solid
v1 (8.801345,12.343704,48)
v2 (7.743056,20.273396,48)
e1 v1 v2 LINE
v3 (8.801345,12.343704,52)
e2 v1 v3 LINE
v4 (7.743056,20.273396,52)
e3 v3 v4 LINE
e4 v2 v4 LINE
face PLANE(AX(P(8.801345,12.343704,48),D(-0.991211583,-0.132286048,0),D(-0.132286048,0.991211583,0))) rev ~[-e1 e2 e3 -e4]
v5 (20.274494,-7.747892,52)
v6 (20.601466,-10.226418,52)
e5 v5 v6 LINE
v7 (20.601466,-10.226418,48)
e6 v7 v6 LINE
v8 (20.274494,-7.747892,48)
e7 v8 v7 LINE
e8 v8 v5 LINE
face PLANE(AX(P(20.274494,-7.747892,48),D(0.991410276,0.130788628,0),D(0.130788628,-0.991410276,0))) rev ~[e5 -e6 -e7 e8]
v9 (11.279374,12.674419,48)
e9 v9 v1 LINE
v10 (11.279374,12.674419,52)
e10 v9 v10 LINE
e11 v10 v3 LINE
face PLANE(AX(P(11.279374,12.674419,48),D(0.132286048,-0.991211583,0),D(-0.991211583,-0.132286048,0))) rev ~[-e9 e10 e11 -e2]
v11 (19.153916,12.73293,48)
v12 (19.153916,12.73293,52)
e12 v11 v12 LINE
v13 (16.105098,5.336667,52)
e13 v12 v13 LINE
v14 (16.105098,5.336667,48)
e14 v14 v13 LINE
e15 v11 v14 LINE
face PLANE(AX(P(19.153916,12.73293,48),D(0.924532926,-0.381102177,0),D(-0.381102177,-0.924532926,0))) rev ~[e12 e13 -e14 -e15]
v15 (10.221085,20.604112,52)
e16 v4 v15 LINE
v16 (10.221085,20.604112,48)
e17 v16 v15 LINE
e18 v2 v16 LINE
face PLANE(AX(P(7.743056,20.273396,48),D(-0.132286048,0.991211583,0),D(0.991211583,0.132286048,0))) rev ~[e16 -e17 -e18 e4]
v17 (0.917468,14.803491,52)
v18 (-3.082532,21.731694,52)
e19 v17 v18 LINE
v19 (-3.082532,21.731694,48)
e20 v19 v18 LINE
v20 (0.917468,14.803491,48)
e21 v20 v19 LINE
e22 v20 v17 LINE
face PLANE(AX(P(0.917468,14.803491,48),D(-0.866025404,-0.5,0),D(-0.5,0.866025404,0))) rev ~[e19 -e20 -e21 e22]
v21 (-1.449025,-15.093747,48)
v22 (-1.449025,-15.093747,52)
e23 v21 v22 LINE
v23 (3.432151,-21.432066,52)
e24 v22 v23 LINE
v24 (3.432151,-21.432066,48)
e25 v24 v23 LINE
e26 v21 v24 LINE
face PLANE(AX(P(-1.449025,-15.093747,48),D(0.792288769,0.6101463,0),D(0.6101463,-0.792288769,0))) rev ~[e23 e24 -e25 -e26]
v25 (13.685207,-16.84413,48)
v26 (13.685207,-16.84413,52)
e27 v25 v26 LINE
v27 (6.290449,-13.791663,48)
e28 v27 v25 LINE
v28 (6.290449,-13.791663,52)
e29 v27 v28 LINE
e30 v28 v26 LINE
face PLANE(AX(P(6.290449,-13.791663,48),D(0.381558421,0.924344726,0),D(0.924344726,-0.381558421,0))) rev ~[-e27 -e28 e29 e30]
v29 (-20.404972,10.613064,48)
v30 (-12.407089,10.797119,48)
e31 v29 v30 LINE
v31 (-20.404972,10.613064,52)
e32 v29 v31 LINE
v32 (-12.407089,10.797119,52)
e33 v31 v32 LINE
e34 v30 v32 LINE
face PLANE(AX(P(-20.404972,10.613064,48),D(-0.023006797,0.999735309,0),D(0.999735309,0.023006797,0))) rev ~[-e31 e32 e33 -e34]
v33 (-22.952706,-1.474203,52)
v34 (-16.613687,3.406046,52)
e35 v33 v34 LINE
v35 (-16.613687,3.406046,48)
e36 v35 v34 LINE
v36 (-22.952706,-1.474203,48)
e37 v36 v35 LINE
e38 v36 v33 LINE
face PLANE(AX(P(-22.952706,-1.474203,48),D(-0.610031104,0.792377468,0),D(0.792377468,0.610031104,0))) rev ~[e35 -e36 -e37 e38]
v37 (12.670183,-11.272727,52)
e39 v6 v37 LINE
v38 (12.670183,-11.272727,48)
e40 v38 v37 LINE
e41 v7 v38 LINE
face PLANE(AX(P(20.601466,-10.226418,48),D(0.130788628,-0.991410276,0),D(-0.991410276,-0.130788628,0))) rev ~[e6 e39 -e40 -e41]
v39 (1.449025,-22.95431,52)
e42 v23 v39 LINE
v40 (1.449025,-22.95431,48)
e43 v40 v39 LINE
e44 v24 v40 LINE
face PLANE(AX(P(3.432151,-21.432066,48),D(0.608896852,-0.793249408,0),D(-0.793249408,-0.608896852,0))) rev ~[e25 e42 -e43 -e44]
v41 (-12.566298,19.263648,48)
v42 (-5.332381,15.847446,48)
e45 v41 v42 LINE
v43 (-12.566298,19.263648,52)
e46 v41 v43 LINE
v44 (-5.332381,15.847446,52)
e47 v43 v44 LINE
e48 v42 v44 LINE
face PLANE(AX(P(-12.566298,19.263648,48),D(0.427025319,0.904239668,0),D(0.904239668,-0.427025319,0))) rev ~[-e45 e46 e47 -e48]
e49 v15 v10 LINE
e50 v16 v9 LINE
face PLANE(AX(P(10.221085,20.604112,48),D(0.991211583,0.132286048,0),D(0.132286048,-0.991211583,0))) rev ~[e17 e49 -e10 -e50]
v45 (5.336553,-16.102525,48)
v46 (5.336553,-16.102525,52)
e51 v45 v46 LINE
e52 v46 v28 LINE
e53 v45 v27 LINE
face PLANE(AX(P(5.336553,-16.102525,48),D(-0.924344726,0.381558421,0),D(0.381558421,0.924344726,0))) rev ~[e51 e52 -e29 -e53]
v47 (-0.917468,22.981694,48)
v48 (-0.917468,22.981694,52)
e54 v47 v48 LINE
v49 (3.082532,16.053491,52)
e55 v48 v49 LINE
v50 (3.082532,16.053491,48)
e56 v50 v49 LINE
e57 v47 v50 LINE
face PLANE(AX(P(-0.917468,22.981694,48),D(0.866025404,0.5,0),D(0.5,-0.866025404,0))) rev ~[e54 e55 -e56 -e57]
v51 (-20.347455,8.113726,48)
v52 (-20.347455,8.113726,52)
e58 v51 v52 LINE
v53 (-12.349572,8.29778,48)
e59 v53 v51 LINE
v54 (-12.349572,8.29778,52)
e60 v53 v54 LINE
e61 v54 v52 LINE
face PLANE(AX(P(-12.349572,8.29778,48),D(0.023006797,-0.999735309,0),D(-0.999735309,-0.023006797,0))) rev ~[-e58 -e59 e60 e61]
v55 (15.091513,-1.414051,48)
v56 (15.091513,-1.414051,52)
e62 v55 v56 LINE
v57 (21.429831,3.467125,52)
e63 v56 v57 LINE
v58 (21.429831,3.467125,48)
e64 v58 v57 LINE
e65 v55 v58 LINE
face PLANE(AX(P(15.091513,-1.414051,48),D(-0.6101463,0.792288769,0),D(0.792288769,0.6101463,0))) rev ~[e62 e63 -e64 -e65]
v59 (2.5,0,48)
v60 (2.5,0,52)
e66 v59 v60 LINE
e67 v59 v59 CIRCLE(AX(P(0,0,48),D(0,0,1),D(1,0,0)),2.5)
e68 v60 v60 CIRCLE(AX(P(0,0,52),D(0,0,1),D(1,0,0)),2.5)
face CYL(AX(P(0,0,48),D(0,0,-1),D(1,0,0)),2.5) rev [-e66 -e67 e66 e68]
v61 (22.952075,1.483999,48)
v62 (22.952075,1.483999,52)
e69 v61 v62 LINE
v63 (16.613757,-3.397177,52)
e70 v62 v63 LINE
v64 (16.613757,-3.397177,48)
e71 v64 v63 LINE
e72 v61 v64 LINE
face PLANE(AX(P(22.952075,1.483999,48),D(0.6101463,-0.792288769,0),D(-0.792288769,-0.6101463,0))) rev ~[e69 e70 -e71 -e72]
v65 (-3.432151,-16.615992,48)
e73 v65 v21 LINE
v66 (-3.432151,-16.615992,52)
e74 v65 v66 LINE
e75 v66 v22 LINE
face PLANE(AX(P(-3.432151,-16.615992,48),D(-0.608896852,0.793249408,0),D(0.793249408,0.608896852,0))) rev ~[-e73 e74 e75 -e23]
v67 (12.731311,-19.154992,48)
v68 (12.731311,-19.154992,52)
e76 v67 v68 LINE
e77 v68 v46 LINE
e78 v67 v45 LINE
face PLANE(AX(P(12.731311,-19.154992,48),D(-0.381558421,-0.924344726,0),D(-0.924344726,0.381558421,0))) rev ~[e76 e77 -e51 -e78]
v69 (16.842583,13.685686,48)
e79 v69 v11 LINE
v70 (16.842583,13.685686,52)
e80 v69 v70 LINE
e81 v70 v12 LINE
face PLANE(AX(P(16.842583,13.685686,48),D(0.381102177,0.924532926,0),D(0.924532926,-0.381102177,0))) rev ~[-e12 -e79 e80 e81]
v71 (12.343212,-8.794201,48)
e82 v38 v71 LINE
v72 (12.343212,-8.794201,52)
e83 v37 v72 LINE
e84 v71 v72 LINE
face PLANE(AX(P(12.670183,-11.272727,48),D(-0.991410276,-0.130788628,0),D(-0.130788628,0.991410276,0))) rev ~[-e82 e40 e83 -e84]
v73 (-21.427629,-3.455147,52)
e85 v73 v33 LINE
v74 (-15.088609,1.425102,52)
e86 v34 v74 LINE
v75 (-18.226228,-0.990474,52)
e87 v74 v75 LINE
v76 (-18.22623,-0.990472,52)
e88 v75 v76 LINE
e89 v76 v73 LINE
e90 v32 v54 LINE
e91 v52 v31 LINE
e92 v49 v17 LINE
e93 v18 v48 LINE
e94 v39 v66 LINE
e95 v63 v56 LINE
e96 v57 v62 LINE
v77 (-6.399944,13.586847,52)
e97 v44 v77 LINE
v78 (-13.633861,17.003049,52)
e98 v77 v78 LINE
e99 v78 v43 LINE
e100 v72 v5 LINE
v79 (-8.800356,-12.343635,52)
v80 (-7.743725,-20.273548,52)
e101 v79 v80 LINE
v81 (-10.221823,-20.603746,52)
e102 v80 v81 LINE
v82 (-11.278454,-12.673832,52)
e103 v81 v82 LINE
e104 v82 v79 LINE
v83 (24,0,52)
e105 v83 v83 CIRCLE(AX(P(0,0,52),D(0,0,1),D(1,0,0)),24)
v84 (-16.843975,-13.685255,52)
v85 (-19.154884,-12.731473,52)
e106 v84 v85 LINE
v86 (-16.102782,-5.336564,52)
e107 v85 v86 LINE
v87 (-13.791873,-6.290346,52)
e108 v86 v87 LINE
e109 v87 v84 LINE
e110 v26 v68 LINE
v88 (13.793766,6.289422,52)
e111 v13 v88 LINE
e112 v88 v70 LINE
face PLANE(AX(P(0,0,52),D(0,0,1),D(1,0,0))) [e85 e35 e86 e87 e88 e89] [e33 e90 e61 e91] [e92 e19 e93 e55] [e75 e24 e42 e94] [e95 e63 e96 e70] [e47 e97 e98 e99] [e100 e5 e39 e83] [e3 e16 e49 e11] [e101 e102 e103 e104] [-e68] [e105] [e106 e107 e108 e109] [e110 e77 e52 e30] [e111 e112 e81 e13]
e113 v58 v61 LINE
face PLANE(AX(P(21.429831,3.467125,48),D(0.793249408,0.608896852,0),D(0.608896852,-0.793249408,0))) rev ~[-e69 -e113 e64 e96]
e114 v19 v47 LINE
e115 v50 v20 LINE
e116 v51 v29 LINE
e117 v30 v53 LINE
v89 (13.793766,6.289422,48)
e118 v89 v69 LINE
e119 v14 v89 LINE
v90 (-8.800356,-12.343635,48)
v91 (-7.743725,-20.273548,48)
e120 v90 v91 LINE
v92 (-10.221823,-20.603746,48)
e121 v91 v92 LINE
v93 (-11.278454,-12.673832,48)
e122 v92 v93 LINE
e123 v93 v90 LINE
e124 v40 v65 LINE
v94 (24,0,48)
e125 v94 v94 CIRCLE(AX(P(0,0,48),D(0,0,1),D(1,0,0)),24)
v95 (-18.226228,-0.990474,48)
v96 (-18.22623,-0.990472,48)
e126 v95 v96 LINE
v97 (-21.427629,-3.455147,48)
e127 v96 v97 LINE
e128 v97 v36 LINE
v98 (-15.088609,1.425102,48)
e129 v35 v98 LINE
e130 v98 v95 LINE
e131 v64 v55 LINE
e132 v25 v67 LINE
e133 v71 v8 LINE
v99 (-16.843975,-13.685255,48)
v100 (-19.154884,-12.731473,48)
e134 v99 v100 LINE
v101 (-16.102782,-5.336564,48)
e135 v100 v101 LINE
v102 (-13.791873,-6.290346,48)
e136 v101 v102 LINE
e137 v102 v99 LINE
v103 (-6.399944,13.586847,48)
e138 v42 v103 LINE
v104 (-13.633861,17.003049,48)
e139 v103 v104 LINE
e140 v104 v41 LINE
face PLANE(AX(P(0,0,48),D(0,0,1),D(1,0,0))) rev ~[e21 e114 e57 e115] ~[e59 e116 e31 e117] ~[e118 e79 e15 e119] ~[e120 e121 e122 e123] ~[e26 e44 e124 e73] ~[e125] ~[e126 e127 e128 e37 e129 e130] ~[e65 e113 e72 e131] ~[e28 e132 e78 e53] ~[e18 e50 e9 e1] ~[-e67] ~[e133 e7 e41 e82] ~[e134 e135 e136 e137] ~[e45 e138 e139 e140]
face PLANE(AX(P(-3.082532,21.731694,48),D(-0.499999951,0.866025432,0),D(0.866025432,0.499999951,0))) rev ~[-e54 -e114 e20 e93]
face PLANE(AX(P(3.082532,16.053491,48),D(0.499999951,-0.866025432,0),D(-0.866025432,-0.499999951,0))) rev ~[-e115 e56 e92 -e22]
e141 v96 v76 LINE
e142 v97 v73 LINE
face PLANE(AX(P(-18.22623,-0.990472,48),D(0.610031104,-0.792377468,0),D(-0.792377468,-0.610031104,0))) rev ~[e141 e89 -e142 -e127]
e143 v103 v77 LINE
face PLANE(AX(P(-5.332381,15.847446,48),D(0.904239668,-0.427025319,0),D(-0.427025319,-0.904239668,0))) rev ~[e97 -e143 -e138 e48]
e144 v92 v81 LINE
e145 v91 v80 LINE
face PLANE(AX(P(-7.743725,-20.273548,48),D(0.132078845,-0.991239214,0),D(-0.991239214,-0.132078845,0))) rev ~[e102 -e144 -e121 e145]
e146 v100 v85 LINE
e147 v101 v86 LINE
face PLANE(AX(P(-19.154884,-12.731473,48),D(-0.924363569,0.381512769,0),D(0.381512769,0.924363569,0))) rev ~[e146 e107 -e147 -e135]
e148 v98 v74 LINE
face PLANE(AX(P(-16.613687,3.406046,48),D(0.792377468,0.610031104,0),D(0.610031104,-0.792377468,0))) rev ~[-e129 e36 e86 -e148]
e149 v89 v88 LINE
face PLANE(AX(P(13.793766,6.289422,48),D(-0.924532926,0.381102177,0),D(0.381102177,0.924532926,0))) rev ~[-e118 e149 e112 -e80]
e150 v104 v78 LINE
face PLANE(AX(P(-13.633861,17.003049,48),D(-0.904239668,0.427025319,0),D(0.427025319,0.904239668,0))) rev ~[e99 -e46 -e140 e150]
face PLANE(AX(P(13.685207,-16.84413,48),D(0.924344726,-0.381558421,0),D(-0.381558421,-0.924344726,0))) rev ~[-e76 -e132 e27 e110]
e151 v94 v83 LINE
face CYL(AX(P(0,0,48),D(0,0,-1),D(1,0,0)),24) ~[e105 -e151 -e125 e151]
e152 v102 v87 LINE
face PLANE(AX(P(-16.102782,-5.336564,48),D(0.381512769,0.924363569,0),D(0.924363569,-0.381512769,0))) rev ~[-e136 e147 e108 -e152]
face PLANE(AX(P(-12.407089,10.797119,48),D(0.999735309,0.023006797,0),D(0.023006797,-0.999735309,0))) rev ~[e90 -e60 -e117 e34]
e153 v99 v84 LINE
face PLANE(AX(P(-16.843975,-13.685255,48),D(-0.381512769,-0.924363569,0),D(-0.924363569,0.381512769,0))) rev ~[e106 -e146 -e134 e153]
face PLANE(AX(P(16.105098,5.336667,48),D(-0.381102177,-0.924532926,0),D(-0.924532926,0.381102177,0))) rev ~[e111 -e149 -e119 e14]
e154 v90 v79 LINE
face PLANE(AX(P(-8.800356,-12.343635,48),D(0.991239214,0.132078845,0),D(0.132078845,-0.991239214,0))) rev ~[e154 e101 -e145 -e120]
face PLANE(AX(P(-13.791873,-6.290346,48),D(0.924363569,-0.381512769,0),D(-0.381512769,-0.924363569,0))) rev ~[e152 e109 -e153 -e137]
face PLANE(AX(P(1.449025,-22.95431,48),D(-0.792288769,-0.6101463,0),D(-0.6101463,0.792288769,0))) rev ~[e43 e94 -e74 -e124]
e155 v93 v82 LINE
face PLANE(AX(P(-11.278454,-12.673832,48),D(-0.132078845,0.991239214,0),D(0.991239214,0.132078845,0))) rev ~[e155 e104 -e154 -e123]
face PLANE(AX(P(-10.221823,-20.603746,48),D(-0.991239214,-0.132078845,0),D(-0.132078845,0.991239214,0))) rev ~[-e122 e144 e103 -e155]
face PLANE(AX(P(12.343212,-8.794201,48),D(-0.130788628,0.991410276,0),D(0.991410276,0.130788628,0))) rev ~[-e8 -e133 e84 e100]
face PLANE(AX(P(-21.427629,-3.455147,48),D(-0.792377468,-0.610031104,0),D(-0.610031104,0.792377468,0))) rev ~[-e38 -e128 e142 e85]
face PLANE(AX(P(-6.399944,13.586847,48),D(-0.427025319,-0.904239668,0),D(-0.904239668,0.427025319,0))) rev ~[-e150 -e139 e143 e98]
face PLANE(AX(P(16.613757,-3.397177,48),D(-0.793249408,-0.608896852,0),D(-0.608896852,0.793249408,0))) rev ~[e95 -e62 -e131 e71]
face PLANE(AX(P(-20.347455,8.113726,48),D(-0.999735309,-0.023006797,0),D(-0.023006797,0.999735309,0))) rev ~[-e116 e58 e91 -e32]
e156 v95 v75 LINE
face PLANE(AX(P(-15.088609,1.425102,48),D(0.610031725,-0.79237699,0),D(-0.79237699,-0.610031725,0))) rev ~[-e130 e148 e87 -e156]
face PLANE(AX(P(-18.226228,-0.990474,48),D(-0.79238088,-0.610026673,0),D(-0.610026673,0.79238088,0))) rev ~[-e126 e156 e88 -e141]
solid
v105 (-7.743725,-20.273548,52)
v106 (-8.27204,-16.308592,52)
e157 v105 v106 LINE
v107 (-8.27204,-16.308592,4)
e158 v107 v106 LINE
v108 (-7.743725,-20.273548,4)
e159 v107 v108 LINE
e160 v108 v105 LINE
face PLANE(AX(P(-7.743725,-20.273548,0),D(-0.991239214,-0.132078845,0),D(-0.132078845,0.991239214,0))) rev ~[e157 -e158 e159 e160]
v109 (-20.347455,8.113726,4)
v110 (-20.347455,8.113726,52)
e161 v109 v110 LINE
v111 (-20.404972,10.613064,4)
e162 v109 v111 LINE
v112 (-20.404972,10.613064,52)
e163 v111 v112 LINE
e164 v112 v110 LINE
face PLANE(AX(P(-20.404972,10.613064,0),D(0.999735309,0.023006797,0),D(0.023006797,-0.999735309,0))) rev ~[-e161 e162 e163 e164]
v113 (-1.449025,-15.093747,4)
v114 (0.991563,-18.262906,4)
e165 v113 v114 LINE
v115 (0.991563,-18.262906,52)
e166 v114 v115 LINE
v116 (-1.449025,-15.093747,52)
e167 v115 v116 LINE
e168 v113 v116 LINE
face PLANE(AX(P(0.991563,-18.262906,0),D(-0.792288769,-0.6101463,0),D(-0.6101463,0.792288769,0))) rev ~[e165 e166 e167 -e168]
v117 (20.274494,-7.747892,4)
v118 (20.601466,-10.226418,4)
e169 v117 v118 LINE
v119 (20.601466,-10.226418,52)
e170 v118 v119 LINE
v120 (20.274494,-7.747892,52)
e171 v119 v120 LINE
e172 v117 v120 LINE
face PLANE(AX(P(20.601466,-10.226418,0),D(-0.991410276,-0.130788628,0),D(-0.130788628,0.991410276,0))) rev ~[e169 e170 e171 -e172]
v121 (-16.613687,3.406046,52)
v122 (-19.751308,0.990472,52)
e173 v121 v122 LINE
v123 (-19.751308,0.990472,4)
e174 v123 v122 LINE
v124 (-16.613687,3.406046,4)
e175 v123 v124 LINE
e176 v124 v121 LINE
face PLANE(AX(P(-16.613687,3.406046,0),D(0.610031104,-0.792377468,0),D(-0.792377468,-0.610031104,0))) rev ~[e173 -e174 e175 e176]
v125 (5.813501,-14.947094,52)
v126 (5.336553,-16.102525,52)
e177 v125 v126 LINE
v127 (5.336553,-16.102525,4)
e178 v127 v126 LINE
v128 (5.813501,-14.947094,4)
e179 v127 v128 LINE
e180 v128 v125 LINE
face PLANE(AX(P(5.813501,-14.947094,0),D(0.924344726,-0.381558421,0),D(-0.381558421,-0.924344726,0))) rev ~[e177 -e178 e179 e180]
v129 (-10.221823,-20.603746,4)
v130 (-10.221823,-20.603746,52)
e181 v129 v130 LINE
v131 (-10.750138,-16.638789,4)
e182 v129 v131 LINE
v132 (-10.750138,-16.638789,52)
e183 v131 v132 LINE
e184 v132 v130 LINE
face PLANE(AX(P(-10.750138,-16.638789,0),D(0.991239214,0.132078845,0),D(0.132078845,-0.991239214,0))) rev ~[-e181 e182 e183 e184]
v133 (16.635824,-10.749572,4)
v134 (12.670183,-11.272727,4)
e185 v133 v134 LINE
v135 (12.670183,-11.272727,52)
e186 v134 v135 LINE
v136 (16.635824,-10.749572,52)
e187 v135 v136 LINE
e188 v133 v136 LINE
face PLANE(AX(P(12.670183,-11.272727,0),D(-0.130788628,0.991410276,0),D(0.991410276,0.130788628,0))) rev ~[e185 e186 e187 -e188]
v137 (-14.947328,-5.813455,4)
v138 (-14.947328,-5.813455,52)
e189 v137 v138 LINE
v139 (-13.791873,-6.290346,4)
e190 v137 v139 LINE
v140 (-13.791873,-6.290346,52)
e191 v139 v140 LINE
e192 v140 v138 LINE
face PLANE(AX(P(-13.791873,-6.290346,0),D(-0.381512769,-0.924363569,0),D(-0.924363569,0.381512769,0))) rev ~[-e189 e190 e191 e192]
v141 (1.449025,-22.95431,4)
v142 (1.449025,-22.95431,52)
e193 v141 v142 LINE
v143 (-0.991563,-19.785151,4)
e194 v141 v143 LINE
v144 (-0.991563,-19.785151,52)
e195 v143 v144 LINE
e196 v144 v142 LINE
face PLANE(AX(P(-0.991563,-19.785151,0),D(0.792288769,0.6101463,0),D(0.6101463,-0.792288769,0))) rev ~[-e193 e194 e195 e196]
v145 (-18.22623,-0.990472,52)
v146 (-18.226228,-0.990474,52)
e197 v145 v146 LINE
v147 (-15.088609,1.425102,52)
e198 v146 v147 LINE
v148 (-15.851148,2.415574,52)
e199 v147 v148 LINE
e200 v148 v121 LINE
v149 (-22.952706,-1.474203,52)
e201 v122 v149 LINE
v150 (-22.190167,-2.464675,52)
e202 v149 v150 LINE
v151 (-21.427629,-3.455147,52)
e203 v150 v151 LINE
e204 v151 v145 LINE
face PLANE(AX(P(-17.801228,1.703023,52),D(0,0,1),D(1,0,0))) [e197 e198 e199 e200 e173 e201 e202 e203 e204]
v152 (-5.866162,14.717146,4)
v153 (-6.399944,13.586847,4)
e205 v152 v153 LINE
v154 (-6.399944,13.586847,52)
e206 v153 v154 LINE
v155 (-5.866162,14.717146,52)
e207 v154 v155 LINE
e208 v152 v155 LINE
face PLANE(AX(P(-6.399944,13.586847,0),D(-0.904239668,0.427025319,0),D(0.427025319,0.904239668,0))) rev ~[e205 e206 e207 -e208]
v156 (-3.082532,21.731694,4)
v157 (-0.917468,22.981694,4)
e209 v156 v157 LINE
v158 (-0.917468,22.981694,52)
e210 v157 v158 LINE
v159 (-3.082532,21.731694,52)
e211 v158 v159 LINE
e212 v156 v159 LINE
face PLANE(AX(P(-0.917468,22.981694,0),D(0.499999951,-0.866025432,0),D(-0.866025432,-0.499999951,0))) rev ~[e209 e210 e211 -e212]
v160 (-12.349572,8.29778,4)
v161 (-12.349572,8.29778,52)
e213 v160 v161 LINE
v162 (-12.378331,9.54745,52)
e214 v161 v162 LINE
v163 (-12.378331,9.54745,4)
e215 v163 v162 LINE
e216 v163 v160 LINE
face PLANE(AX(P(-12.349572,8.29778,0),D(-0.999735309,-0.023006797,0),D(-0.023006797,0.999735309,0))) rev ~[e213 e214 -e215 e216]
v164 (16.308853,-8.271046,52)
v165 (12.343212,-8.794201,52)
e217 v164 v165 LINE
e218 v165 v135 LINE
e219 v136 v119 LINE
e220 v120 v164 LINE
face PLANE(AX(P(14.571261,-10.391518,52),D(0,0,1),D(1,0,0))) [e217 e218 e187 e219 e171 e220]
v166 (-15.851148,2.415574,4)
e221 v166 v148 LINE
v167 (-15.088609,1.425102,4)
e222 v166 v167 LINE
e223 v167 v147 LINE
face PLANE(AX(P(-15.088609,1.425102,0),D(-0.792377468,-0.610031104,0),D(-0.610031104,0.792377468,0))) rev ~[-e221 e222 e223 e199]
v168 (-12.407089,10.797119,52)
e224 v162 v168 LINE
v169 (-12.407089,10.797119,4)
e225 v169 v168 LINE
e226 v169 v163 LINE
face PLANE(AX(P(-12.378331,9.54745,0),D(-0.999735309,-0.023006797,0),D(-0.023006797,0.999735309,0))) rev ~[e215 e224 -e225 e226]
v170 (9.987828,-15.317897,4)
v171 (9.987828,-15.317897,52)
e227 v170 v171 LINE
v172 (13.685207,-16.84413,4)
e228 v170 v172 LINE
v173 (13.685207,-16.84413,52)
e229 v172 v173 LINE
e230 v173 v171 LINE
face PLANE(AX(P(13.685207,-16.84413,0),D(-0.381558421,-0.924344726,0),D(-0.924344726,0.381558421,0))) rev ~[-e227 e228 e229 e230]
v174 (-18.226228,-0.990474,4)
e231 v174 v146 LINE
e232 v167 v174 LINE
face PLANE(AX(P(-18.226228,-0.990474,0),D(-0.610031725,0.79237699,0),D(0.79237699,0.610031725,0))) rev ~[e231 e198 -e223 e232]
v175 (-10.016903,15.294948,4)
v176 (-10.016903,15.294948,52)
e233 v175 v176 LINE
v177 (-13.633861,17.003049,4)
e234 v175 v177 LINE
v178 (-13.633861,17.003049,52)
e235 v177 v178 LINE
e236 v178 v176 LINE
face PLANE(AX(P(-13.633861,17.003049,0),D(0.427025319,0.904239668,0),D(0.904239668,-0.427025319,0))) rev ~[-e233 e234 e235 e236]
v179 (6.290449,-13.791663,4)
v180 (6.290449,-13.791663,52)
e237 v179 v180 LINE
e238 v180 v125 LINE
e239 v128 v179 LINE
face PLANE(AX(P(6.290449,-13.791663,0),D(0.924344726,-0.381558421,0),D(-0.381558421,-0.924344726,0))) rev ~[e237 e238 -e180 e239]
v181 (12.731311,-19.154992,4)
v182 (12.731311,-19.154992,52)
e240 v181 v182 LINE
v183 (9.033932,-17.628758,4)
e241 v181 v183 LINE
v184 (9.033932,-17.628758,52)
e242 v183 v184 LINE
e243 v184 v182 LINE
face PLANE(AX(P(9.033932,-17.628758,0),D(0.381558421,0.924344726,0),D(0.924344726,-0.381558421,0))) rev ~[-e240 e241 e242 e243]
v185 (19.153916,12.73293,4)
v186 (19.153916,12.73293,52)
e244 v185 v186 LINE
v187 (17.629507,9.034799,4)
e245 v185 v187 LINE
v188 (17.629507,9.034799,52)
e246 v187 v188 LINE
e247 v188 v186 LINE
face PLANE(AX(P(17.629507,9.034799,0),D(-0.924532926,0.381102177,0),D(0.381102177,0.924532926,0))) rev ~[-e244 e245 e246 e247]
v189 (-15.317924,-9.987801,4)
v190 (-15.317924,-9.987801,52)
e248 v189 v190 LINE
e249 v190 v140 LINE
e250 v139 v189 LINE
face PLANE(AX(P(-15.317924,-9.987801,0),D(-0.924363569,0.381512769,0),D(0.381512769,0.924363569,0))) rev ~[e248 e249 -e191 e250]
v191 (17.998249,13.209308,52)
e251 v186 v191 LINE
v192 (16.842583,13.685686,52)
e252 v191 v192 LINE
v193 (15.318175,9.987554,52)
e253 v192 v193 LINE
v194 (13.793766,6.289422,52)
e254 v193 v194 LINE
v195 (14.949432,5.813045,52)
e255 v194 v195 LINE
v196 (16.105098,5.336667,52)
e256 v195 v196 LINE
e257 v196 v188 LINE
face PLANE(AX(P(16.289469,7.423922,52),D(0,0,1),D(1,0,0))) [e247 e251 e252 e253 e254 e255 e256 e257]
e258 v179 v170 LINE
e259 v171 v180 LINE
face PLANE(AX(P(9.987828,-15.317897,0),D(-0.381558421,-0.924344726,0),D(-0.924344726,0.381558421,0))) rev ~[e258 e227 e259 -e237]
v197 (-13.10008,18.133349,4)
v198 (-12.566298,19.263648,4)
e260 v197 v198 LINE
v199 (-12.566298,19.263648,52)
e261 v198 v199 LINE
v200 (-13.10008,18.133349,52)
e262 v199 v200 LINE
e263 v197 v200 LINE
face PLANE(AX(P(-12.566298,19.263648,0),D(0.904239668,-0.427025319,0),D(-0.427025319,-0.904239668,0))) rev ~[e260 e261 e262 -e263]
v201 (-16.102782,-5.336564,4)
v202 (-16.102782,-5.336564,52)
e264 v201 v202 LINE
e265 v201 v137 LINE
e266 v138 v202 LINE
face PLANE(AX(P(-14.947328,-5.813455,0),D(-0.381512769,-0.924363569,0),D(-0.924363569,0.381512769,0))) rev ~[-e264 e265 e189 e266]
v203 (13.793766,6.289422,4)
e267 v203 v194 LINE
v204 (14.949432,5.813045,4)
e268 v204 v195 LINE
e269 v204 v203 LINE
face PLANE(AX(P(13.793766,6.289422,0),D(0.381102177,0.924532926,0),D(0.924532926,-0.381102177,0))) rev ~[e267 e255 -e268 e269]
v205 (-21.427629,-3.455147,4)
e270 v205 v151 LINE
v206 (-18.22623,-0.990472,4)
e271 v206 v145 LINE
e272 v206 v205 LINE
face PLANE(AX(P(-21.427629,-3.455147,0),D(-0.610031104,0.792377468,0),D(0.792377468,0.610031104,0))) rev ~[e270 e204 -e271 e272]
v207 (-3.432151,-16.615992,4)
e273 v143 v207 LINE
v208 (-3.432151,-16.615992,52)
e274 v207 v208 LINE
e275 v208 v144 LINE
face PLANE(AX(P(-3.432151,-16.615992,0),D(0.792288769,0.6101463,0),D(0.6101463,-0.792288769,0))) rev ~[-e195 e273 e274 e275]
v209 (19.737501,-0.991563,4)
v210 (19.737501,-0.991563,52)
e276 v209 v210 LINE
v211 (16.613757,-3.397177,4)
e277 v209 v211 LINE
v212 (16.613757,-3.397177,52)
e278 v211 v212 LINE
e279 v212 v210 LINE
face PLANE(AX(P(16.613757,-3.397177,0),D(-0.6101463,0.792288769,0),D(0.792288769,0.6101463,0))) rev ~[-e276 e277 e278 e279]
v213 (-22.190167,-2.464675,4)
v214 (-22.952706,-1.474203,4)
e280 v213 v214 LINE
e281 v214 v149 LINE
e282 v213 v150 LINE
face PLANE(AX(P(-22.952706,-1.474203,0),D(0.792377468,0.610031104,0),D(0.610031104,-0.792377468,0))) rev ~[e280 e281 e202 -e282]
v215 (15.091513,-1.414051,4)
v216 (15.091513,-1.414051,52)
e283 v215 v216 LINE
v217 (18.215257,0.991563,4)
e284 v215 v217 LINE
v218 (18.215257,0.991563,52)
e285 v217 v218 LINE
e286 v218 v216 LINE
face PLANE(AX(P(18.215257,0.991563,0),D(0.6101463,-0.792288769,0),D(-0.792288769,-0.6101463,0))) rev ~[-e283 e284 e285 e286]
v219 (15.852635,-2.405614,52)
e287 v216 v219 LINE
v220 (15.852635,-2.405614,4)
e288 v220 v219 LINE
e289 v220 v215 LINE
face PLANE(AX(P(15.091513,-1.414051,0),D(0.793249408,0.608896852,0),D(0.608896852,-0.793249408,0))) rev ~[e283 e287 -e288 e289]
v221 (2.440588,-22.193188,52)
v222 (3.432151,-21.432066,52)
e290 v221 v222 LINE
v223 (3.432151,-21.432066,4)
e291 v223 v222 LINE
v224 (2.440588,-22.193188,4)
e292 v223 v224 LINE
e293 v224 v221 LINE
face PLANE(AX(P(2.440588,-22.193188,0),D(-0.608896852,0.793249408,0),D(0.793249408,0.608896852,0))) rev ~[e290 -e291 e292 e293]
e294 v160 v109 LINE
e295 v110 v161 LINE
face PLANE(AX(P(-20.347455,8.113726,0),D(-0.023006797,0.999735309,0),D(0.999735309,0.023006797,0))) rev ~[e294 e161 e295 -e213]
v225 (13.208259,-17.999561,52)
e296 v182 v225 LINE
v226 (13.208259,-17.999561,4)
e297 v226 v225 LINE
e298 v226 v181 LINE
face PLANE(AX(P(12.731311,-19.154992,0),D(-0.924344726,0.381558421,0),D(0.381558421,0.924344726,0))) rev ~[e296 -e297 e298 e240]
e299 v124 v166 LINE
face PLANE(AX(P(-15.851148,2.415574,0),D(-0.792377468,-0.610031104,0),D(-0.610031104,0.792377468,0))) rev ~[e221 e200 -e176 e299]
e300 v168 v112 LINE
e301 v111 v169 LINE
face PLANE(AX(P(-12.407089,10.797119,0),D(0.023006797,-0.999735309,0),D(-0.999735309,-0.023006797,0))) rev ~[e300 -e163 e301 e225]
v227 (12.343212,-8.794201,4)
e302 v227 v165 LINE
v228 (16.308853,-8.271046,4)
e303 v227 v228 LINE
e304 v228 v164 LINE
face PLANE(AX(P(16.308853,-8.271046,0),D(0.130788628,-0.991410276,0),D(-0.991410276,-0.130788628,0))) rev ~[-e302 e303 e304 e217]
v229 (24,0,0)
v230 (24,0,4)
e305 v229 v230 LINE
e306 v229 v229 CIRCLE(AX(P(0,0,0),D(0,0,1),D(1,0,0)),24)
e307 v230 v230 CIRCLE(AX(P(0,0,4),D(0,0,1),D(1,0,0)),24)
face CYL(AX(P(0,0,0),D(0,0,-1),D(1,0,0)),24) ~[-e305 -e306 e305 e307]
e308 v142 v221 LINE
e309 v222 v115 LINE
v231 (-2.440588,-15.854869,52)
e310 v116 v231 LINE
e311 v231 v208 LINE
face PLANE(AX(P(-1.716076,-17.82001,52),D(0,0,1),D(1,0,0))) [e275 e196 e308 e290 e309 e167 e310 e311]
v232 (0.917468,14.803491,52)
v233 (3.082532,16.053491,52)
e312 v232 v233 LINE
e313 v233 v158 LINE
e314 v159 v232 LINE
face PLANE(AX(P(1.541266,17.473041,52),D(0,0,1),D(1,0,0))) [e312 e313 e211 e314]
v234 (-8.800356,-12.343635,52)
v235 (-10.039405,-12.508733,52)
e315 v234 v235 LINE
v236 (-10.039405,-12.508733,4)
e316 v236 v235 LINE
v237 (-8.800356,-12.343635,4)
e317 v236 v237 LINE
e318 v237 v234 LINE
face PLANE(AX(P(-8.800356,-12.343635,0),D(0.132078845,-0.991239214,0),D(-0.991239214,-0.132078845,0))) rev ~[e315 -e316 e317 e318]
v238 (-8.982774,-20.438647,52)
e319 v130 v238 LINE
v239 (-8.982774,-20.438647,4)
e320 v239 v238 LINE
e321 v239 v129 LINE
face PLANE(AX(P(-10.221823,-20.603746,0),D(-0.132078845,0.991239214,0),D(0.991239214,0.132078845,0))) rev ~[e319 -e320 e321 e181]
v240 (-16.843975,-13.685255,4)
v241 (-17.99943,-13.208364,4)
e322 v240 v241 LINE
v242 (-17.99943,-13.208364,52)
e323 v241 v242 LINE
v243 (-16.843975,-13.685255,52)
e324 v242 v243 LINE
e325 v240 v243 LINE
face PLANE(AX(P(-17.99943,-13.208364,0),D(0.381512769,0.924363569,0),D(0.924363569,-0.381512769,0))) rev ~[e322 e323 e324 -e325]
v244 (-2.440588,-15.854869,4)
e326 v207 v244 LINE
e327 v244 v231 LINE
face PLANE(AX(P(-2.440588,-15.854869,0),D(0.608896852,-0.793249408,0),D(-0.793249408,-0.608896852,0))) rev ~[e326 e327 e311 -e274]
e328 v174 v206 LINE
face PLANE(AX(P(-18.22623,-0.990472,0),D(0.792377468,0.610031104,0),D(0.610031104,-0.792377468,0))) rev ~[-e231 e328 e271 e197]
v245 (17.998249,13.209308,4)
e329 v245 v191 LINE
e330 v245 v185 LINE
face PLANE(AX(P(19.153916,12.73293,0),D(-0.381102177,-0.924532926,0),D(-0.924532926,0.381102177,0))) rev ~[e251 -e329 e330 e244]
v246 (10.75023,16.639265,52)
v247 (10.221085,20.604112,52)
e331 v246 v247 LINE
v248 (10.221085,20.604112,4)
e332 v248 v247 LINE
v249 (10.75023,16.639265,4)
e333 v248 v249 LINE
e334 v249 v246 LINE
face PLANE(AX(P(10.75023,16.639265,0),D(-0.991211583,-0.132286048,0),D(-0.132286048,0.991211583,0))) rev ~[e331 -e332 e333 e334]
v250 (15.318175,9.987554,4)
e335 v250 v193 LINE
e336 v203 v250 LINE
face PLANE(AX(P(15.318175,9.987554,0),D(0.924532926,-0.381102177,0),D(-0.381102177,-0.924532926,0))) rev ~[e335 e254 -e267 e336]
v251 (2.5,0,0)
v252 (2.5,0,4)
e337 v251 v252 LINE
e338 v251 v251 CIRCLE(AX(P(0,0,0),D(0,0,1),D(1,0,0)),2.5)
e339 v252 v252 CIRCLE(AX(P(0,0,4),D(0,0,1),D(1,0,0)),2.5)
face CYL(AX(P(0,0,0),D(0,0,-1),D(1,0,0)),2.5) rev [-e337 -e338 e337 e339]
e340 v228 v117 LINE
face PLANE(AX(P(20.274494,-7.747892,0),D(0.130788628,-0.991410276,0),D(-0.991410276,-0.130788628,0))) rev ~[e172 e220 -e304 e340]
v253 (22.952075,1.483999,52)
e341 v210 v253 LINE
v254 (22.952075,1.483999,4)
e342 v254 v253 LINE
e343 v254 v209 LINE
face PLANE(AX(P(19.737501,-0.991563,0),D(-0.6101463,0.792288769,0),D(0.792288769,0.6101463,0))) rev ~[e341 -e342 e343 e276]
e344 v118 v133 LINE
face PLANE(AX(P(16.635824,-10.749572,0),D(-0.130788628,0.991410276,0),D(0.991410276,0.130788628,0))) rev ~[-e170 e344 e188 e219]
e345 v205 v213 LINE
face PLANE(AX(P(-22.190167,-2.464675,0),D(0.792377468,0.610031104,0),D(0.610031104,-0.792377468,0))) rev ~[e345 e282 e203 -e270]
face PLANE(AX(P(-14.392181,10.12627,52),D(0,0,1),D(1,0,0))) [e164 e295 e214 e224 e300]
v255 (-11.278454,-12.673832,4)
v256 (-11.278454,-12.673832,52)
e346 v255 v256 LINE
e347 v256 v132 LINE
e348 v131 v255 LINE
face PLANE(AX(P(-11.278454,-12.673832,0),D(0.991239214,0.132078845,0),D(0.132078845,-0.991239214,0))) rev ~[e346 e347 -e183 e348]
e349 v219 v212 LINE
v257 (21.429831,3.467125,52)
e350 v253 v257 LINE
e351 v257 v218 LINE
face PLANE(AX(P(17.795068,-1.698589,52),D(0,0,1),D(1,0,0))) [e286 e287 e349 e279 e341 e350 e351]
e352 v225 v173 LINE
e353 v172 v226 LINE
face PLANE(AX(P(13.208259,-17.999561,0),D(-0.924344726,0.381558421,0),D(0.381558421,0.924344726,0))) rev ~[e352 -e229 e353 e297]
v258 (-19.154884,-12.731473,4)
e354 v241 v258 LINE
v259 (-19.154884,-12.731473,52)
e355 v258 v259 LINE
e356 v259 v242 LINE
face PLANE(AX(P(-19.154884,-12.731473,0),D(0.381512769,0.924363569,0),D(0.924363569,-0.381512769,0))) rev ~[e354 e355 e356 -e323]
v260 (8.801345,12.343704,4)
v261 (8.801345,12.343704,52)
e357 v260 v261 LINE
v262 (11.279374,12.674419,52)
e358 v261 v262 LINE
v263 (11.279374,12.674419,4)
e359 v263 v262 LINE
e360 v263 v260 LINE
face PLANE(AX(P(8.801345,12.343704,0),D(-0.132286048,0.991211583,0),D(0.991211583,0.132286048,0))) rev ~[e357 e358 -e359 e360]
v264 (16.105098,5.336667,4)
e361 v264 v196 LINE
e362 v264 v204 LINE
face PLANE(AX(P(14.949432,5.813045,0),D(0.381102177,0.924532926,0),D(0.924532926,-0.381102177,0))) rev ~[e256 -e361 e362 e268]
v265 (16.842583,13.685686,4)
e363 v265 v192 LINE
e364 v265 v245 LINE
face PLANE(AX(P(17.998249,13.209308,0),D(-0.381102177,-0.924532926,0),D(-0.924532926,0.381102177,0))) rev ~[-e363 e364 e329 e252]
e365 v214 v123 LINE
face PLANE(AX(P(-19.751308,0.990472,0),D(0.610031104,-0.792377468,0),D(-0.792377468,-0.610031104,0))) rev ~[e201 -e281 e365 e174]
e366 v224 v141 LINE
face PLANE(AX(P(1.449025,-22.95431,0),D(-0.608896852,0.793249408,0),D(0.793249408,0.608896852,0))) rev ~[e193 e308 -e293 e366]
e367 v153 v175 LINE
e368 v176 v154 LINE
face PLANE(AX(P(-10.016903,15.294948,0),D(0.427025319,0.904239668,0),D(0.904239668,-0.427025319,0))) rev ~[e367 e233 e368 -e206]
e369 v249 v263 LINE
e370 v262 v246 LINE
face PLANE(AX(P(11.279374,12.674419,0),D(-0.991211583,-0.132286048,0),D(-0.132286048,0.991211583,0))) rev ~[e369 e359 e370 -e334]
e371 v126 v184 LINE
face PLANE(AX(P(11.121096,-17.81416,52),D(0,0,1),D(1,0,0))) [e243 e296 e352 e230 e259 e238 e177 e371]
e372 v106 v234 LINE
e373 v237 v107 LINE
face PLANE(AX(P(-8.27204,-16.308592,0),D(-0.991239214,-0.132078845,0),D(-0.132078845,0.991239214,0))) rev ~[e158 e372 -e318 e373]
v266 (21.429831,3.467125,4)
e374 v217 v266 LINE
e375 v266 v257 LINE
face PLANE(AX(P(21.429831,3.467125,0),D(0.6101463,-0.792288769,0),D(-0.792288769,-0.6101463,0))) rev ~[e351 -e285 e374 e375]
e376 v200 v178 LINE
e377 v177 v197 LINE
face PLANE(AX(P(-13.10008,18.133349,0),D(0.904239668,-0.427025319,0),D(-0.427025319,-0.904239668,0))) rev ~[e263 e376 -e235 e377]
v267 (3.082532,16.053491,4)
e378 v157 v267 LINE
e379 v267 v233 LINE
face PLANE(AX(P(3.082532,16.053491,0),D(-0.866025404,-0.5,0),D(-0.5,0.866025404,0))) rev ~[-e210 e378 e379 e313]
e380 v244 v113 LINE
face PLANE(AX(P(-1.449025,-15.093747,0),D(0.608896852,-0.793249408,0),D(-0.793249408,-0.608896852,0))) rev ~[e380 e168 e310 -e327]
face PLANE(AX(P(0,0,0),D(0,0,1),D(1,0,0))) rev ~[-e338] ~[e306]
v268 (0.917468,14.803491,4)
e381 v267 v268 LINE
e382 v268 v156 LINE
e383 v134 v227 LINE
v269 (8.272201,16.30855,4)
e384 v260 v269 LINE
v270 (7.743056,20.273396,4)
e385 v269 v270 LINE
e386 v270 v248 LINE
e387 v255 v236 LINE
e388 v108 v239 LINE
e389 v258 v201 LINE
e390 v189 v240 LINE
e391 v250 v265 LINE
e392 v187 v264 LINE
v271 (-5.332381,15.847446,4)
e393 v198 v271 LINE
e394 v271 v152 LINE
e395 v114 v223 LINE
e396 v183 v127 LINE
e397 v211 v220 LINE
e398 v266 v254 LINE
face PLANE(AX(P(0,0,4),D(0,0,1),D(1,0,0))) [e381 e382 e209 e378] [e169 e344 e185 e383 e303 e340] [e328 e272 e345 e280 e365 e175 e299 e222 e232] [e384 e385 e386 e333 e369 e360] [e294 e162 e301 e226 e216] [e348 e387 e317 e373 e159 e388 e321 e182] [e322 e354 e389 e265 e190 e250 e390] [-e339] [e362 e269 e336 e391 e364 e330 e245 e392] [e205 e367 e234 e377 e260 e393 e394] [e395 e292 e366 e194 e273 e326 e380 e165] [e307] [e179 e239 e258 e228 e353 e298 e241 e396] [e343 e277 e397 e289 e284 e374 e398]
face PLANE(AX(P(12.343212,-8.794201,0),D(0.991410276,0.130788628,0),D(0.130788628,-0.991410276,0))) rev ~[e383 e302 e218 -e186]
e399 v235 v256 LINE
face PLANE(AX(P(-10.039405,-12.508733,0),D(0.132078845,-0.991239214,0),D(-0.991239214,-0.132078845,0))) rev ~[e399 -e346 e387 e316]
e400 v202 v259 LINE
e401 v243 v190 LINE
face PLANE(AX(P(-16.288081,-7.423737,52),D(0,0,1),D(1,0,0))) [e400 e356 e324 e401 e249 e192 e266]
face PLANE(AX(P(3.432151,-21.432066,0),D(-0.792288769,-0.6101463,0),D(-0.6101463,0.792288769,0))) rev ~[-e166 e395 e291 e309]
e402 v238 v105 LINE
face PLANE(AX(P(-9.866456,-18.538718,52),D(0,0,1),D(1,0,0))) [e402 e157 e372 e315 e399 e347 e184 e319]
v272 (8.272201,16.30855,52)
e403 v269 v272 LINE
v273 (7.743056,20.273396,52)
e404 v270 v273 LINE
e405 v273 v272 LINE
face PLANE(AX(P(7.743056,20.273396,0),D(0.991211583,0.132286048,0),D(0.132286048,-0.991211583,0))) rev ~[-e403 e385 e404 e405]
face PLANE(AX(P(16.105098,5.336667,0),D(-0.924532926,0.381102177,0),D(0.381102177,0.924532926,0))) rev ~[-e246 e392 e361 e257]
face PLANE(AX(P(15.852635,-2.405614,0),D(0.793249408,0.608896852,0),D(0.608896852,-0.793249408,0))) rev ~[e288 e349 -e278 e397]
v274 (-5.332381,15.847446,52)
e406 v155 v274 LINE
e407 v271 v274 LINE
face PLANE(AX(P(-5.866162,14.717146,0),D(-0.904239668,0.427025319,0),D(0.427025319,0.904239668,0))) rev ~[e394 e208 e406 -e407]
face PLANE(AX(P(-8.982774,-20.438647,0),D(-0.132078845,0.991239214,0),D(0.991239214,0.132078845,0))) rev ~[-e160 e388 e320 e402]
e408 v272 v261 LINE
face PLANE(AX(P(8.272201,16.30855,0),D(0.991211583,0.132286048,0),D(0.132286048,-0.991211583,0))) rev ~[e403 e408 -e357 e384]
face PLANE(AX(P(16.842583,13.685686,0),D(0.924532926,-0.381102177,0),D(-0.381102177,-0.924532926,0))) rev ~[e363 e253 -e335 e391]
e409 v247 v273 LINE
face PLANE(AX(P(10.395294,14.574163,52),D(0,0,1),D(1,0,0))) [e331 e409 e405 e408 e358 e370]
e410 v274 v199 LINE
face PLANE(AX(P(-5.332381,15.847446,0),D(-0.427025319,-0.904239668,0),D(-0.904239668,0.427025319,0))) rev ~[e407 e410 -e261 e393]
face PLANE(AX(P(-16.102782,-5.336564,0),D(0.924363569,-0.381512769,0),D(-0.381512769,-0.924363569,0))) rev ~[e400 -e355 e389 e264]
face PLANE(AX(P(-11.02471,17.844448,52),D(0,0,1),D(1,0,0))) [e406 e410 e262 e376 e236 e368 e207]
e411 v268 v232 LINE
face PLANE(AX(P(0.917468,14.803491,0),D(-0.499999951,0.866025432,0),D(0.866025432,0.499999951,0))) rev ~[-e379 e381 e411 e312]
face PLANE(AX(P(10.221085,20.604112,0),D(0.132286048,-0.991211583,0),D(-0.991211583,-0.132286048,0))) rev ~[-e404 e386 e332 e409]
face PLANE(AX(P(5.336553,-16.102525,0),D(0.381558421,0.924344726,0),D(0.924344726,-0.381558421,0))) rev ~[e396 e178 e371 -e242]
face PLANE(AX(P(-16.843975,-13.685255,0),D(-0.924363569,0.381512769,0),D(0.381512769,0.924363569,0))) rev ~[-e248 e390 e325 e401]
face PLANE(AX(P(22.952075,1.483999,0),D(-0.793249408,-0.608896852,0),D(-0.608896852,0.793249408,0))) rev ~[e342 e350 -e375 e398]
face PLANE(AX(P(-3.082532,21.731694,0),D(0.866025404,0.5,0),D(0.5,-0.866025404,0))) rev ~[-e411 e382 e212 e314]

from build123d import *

# Parameters (mm, degrees)
F0_R        = 24
F0_R_2      = 2.5
F1_DEPTH    = 4
F2_DEPTH    = 52
F3_START    = 44
F1_FACE_R   = 24
F1_FACE_R_2 = 2.5
F3_DEPTH    = 4


# Not quite as in the source:
# - ends of sketch curves that miss each other by under 0.0002 mm in the source are joined


with BuildPart() as f1:
    # F0 (on Top) → F1 (new body)
    with BuildSketch(Plane.XY):
        Circle(F0_R)
        Polygon((-8.9827740816, -20.4386470385), (-10.2218230987, -20.6037455949), (-10.7501384793, -16.6387887403), (-11.2784538598, -12.6738318857), (-10.0394048428, -12.5087333293), (-8.8003558257, -12.3436347729), (-8.2720404452, -16.3085916275), (-7.7437250646, -20.273548482), align=None, mode=Mode.SUBTRACT)
        Polygon((-17.9994299012, -13.2083639741), (-19.154884362, -12.7314730129), (-17.6288332862, -9.0340187381), (-16.1027822104, -5.3365644633), (-14.9473277496, -5.8134554245), (-13.7918732887, -6.2903463857), (-15.3179243645, -9.9878006605), (-16.8439754403, -13.6852549352), align=None, mode=Mode.SUBTRACT)
        Polygon((-22.1901674017, -2.4646747911), (-22.9527062815, -1.4742029558), (-19.7513076007, 0.9904718354), (-16.613686535, 3.4060458753), (-15.8511476551, 2.4155740399), (-15.0886087753, 1.4251022046), (-18.226229841, -0.9904718354), (-21.4276285218, -3.4551466265), align=None, mode=Mode.SUBTRACT)
        Polygon((2.4405882298, -22.1931875166), (1.4490252381, -22.954309527), (-0.9915629917, -19.7851505161), (-3.4321512214, -16.6159915053), (-2.4405882298, -15.8548694949), (-1.4490252381, -15.0937474845), (0.9915629917, -18.2629064954), (3.4321512214, -21.4320655062), align=None, mode=Mode.SUBTRACT)
        Polygon((13.2082589659, -17.9995611772), (12.7313109402, -19.1549920841), (9.0339320379, -17.6287584019), (5.3365531356, -16.1025247196), (5.8135011613, -14.9470938127), (6.290449187, -13.7916629057), (9.9878280893, -15.3178965879), (13.6852069916, -16.8441302702), align=None, mode=Mode.SUBTRACT)
        Polygon((20.4379798112, -8.9871546743), (20.6014655966, -10.2264175189), (16.6358244939, -10.7495720322), (12.6701833913, -11.2727265454), (12.5066976059, -10.0334637008), (12.3432118205, -8.7942008562), (16.3088529232, -8.271046343), (20.2744940258, -7.7478918297), align=None, mode=Mode.SUBTRACT)
        Polygon((-20.3762131188, 9.3633951434), (-20.4049716149, 10.6130642792), (-16.4060303805, 10.7050914668), (-12.407089146, 10.7971186544), (-12.3783306499, 9.5474495186), (-12.3495721537, 8.2977803828), (-16.3485133882, 8.2057531952), (-20.3474546227, 8.1137260076), align=None, mode=Mode.SUBTRACT)
        Polygon((-13.1000797836, 18.1333488537), (-12.5662981354, 19.2636484388), (-8.9493394632, 17.5555471644), (-5.332380791, 15.84744589), (-5.8661624392, 14.7171463049), (-6.3999440875, 13.5868467198), (-10.0169027597, 15.2949479943), (-13.6338614319, 17.0030492687), align=None, mode=Mode.SUBTRACT)
        Circle(F0_R_2, mode=Mode.SUBTRACT)
        Polygon((22.1909529643, 2.4755624376), (22.9520749747, 1.4839994459), (19.737501164, -0.9915629917), (16.613756953, -3.3971770136), (15.8526349426, -2.4056140219), (15.0915129323, -1.4140510302), (18.2152571432, 0.9915629917), (21.4298309539, 3.4671254293), align=None, mode=Mode.SUBTRACT)
        Polygon((17.9982494725, 13.2093081016), (19.1539156294, 12.73293038), (17.6295069203, 9.0347986777), (16.1050982111, 5.3366669754), (14.9494320542, 5.813044697), (13.7937658972, 6.2894224186), (15.3181746063, 9.9875541209), (16.8425833155, 13.6856858232), align=None, mode=Mode.SUBTRACT)
        Polygon((8.9820708555, 20.4387540345), (10.2210853338, 20.6041115945), (10.7502295258, 16.6392652641), (11.2793737179, 12.6744189336), (10.0403592396, 12.5090613736), (8.8013447613, 12.3437038136), (8.2722005693, 16.3085501441), (7.7430563772, 20.2733964745), align=None, mode=Mode.SUBTRACT)
        Polygon((-2, 22.3566939084), (-0.9174682099, 22.9816938471), (1.0825317901, 19.517592232), (3.0825317901, 16.0534906169), (2, 15.4284906782), (0.9174682099, 14.8034907395), (-3.0825317901, 14.8034907395), (-3.0825317901, 21.7316939697), align=None, mode=Mode.SUBTRACT)
        Polygon((-1.0825317901, 18.2675923546), (-3.0825317901, 21.7316939697), (-3.0825317901, 14.8034907395), (0.9174682099, 14.8034907395), align=None)
    extrude(amount=F1_DEPTH)

    # F0 (on Top) → F2 (join)
    with BuildSketch(Plane.XY):
        Polygon((11.2793737179, 12.6744189336), (10.7502295258, 16.6392652641), (9.5112150476, 16.4739077041), (10.0403592396, 12.5090613736), align=None)
        Polygon((10.0403592396, 12.5090613736), (9.5112150476, 16.4739077041), (8.2722005693, 16.3085501441), (8.8013447613, 12.3437038136), align=None)
        Polygon((10.7502295258, 16.6392652641), (10.2210853338, 20.6041115945), (8.9820708555, 20.4387540345), (9.5112150476, 16.4739077041), align=None)
        Polygon((9.5112150476, 16.4739077041), (8.9820708555, 20.4387540345), (7.7430563772, 20.2733964745), (8.2722005693, 16.3085501441), align=None)
        Polygon((3.0825317901, 16.0534906169), (1.0825317901, 19.517592232), (0, 18.8925922933), (2, 15.4284906782), align=None)
        Polygon((2, 15.4284906782), (0, 18.8925922933), (-1.0825317901, 18.2675923546), (0.9174682099, 14.8034907395), align=None)
        Polygon((1.0825317901, 19.517592232), (-0.9174682099, 22.9816938471), (-2, 22.3566939084), (0, 18.8925922933), align=None)
        Polygon((0, 18.8925922933), (-2, 22.3566939084), (-3.0825317901, 21.7316939697), (-1.0825317901, 18.2675923546), align=None)
        Polygon((-8.9493394632, 17.5555471644), (-12.5662981354, 19.2636484388), (-13.1000797836, 18.1333488537), (-9.4831211114, 16.4252475793), align=None)
        Polygon((-9.4831211114, 16.4252475793), (-13.1000797836, 18.1333488537), (-13.6338614319, 17.0030492687), (-10.0169027597, 15.2949479943), align=None)
        Polygon((-5.332380791, 15.84744589), (-8.9493394632, 17.5555471644), (-9.4831211114, 16.4252475793), (-5.8661624392, 14.7171463049), align=None)
        Polygon((-5.8661624392, 14.7171463049), (-9.4831211114, 16.4252475793), (-10.0169027597, 15.2949479943), (-6.3999440875, 13.5868467198), align=None)
        Polygon((-12.407089146, 10.7971186544), (-16.4060303805, 10.7050914668), (-16.3772718843, 9.455422331), (-12.3783306499, 9.5474495186), align=None)
        Polygon((-16.4060303805, 10.7050914668), (-20.4049716149, 10.6130642792), (-20.3762131188, 9.3633951434), (-16.3772718843, 9.455422331), align=None)
        Polygon((-16.3772718843, 9.455422331), (-20.3762131188, 9.3633951434), (-20.3474546227, 8.1137260076), (-16.3485133882, 8.2057531952), align=None)
        Polygon((-12.3783306499, 9.5474495186), (-16.3772718843, 9.455422331), (-16.3485133882, 8.2057531952), (-12.3495721537, 8.2977803828), align=None)
        Polygon((-16.613686535, 3.4060458753), (-19.7513076007, 0.9904718354), (-18.9887687209, 0), (-15.8511476551, 2.4155740399), align=None)
        Polygon((-19.7513076007, 0.9904718354), (-22.9527062815, -1.4742029558), (-22.1901674017, -2.4646747911), (-18.9887687209, 0), align=None)
        Polygon((-18.9887687209, 0), (-22.1901674017, -2.4646747911), (-21.4276285218, -3.4551466265), (-18.226229841, -0.9904718354), align=None)
        Polygon((-15.8511476551, 2.4155740399), (-18.9887687209, 0), (-18.2262279469, -0.9904742957), (-15.0886087753, 1.4251022046), align=None)
        Polygon((-16.1027822104, -5.3365644633), (-17.6288332862, -9.0340187381), (-16.4733788254, -9.5109096993), (-14.9473277496, -5.8134554245), align=None)
        Polygon((-14.9473277496, -5.8134554245), (-16.4733788254, -9.5109096993), (-15.3179243645, -9.9878006605), (-13.7918732887, -6.2903463857), align=None)
        Polygon((-16.4733788254, -9.5109096993), (-17.9994299012, -13.2083639741), (-16.8439754403, -13.6852549352), (-15.3179243645, -9.9878006605), align=None)
        Polygon((-17.6288332862, -9.0340187381), (-19.154884362, -12.7314730129), (-17.9994299012, -13.2083639741), (-16.4733788254, -9.5109096993), align=None)
        Polygon((-10.7501384793, -16.6387887403), (-10.2218230987, -20.6037455949), (-8.9827740816, -20.4386470385), (-9.5110894622, -16.4736901839), align=None)
        Polygon((-9.5110894622, -16.4736901839), (-8.9827740816, -20.4386470385), (-7.7437250646, -20.273548482), (-8.2720404452, -16.3085916275), align=None)
        Polygon((-11.2784538598, -12.6738318857), (-10.7501384793, -16.6387887403), (-9.5110894622, -16.4736901839), (-10.0394048428, -12.5087333293), align=None)
        Polygon((-10.0394048428, -12.5087333293), (-9.5110894622, -16.4736901839), (-8.2720404452, -16.3085916275), (-8.8003558257, -12.3436347729), align=None)
        Polygon((-3.4321512214, -16.6159915053), (-0.9915629917, -19.7851505161), (0, -19.0240285057), (-2.4405882298, -15.8548694949), align=None)
        Polygon((-2.4405882298, -15.8548694949), (0, -19.0240285057), (0.9915629917, -18.2629064954), (-1.4490252381, -15.0937474845), align=None)
        Polygon((0, -19.0240285057), (2.4405882298, -22.1931875166), (3.4321512214, -21.4320655062), (0.9915629917, -18.2629064954), align=None)
        Polygon((-0.9915629917, -19.7851505161), (1.4490252381, -22.954309527), (2.4405882298, -22.1931875166), (0, -19.0240285057), align=None)
        Polygon((9.0339320379, -17.6287584019), (12.7313109402, -19.1549920841), (13.2082589659, -17.9995611772), (9.5108800636, -16.4733274949), align=None)
        Polygon((5.3365531356, -16.1025247196), (9.0339320379, -17.6287584019), (9.5108800636, -16.4733274949), (5.8135011613, -14.9470938127), align=None)
        Polygon((5.8135011613, -14.9470938127), (9.5108800636, -16.4733274949), (9.9878280893, -15.3178965879), (6.290449187, -13.7916629057), align=None)
        Polygon((9.5108800636, -16.4733274949), (13.2082589659, -17.9995611772), (13.6852069916, -16.8441302702), (9.9878280893, -15.3178965879), align=None)
        Polygon((12.6701833913, -11.2727265454), (16.6358244939, -10.7495720322), (16.4723387086, -9.5103091876), (12.5066976059, -10.0334637008), align=None)
        Polygon((16.6358244939, -10.7495720322), (20.6014655966, -10.2264175189), (20.4379798112, -8.9871546743), (16.4723387086, -9.5103091876), align=None)
        Polygon((12.5066976059, -10.0334637008), (16.4723387086, -9.5103091876), (16.3088529232, -8.271046343), (12.3432118205, -8.7942008562), align=None)
        Polygon((16.4723387086, -9.5103091876), (20.4379798112, -8.9871546743), (20.2744940258, -7.7478918297), (16.3088529232, -8.271046343), align=None)
        Polygon((16.613756953, -3.3971770136), (19.737501164, -0.9915629917), (18.9763791536, 0), (15.8526349426, -2.4056140219), align=None)
        Polygon((19.737501164, -0.9915629917), (22.9520749747, 1.4839994459), (22.1909529643, 2.4755624376), (18.9763791536, 0), align=None)
        Polygon((18.9763791536, 0), (22.1909529643, 2.4755624376), (21.4298309539, 3.4671254293), (18.2152571432, 0.9915629917), align=None)
        Polygon((15.8526349426, -2.4056140219), (18.9763791536, 0), (18.2152571432, 0.9915629917), (15.0915129323, -1.4140510302), align=None)
        Polygon((16.1050982111, 5.3366669754), (17.6295069203, 9.0347986777), (16.4738407633, 9.5111763993), (14.9494320542, 5.813044697), align=None)
        Polygon((14.9494320542, 5.813044697), (16.4738407633, 9.5111763993), (15.3181746063, 9.9875541209), (13.7937658972, 6.2894224186), align=None)
        Polygon((16.4738407633, 9.5111763993), (17.9982494725, 13.2093081016), (16.8425833155, 13.6856858232), (15.3181746063, 9.9875541209), align=None)
        Polygon((17.6295069203, 9.0347986777), (19.1539156294, 12.73293038), (17.9982494725, 13.2093081016), (16.4738407633, 9.5111763993), align=None)
    extrude(amount=F2_DEPTH)


with BuildPart() as f3:
    # F1_face (on face) → F3 (new body)
    with BuildSketch(Plane(origin=(-0.0016074104, 0.0028842551, 4), x_dir=(1, 0, 0), z_dir=(0, 0, 1)).offset(F3_START)):
        with Locations((0.0016074104, -0.0028842551)):
            Circle(F1_FACE_R)
        Polygon((-7.7421176542, -20.2764327371), (-10.2202156883, -20.60662985), (-11.2768464494, -12.6767161408), (-8.7987484153, -12.346519028), align=None, mode=Mode.SUBTRACT)
        Polygon((-16.8423680298, -13.6881391903), (-19.1532769516, -12.734357268), (-16.1011748, -5.3394487184), (-13.7902658783, -6.2932306408), align=None, mode=Mode.SUBTRACT)
        Polygon((-18.2246224306, -0.9933560905), (-21.4260211114, -3.4580308816), (-22.9510988711, -1.4770872108), (-16.6120791246, 3.4031616202), (-15.0870013648, 1.4222179495), (-18.2246205365, -0.9933585508), align=None, mode=Mode.SUBTRACT)
        Polygon((3.4337586319, -21.4349497613), (1.4506326485, -22.9571937821), (-3.430543811, -16.6188757604), (-1.4474178276, -15.0966317396), align=None, mode=Mode.SUBTRACT)
        Polygon((13.6868144021, -16.8470145253), (12.7329183507, -19.1578763392), (5.3381605461, -16.1054089747), (6.2920565975, -13.7945471608), align=None, mode=Mode.SUBTRACT)
        with Locations((0.0016074104, -0.0028842551)):
            Circle(F1_FACE_R_2, mode=Mode.SUBTRACT)
        Polygon((20.2761014363, -7.7507760848), (20.6030730071, -10.229301774), (12.6717908017, -11.2756108005), (12.3448192309, -8.7970851113), align=None, mode=Mode.SUBTRACT)
        Polygon((-20.4033642045, 10.6101800241), (-12.4054817355, 10.7942343993), (-12.3479647433, 8.2948961277), (-20.3458472122, 8.1108417526), align=None, mode=Mode.SUBTRACT)
        Polygon((-13.6322540214, 17.0001650136), (-12.5646907249, 19.2607641837), (-5.3307733805, 15.8445616349), (-6.398336677, 13.5839624647), align=None, mode=Mode.SUBTRACT)
        Polygon((21.4314383644, 3.4642411742), (22.9536823851, 1.4811151908), (16.6153643635, -3.4000612687), (15.0931203427, -1.4169352853), align=None, mode=Mode.SUBTRACT)
        Polygon((16.8441907259, 13.6828015681), (19.1555230399, 12.7300461249), (16.1067056216, 5.3337827203), (13.7953733076, 6.2865381635), align=None, mode=Mode.SUBTRACT)
        Polygon((7.7446637877, 20.2705122194), (10.2226927442, 20.6012273394), (11.2809811283, 12.6715346785), (8.8029521718, 12.3408195585), align=None, mode=Mode.SUBTRACT)
        Polygon((-3.0809243797, 21.7288097146), (-0.9158607994, 22.978809592), (3.0841392006, 16.0506063618), (0.9190756203, 14.8006064844), align=None, mode=Mode.SUBTRACT)
    extrude(amount=F3_DEPTH)


solid = Compound([f1.part, f3.part])
